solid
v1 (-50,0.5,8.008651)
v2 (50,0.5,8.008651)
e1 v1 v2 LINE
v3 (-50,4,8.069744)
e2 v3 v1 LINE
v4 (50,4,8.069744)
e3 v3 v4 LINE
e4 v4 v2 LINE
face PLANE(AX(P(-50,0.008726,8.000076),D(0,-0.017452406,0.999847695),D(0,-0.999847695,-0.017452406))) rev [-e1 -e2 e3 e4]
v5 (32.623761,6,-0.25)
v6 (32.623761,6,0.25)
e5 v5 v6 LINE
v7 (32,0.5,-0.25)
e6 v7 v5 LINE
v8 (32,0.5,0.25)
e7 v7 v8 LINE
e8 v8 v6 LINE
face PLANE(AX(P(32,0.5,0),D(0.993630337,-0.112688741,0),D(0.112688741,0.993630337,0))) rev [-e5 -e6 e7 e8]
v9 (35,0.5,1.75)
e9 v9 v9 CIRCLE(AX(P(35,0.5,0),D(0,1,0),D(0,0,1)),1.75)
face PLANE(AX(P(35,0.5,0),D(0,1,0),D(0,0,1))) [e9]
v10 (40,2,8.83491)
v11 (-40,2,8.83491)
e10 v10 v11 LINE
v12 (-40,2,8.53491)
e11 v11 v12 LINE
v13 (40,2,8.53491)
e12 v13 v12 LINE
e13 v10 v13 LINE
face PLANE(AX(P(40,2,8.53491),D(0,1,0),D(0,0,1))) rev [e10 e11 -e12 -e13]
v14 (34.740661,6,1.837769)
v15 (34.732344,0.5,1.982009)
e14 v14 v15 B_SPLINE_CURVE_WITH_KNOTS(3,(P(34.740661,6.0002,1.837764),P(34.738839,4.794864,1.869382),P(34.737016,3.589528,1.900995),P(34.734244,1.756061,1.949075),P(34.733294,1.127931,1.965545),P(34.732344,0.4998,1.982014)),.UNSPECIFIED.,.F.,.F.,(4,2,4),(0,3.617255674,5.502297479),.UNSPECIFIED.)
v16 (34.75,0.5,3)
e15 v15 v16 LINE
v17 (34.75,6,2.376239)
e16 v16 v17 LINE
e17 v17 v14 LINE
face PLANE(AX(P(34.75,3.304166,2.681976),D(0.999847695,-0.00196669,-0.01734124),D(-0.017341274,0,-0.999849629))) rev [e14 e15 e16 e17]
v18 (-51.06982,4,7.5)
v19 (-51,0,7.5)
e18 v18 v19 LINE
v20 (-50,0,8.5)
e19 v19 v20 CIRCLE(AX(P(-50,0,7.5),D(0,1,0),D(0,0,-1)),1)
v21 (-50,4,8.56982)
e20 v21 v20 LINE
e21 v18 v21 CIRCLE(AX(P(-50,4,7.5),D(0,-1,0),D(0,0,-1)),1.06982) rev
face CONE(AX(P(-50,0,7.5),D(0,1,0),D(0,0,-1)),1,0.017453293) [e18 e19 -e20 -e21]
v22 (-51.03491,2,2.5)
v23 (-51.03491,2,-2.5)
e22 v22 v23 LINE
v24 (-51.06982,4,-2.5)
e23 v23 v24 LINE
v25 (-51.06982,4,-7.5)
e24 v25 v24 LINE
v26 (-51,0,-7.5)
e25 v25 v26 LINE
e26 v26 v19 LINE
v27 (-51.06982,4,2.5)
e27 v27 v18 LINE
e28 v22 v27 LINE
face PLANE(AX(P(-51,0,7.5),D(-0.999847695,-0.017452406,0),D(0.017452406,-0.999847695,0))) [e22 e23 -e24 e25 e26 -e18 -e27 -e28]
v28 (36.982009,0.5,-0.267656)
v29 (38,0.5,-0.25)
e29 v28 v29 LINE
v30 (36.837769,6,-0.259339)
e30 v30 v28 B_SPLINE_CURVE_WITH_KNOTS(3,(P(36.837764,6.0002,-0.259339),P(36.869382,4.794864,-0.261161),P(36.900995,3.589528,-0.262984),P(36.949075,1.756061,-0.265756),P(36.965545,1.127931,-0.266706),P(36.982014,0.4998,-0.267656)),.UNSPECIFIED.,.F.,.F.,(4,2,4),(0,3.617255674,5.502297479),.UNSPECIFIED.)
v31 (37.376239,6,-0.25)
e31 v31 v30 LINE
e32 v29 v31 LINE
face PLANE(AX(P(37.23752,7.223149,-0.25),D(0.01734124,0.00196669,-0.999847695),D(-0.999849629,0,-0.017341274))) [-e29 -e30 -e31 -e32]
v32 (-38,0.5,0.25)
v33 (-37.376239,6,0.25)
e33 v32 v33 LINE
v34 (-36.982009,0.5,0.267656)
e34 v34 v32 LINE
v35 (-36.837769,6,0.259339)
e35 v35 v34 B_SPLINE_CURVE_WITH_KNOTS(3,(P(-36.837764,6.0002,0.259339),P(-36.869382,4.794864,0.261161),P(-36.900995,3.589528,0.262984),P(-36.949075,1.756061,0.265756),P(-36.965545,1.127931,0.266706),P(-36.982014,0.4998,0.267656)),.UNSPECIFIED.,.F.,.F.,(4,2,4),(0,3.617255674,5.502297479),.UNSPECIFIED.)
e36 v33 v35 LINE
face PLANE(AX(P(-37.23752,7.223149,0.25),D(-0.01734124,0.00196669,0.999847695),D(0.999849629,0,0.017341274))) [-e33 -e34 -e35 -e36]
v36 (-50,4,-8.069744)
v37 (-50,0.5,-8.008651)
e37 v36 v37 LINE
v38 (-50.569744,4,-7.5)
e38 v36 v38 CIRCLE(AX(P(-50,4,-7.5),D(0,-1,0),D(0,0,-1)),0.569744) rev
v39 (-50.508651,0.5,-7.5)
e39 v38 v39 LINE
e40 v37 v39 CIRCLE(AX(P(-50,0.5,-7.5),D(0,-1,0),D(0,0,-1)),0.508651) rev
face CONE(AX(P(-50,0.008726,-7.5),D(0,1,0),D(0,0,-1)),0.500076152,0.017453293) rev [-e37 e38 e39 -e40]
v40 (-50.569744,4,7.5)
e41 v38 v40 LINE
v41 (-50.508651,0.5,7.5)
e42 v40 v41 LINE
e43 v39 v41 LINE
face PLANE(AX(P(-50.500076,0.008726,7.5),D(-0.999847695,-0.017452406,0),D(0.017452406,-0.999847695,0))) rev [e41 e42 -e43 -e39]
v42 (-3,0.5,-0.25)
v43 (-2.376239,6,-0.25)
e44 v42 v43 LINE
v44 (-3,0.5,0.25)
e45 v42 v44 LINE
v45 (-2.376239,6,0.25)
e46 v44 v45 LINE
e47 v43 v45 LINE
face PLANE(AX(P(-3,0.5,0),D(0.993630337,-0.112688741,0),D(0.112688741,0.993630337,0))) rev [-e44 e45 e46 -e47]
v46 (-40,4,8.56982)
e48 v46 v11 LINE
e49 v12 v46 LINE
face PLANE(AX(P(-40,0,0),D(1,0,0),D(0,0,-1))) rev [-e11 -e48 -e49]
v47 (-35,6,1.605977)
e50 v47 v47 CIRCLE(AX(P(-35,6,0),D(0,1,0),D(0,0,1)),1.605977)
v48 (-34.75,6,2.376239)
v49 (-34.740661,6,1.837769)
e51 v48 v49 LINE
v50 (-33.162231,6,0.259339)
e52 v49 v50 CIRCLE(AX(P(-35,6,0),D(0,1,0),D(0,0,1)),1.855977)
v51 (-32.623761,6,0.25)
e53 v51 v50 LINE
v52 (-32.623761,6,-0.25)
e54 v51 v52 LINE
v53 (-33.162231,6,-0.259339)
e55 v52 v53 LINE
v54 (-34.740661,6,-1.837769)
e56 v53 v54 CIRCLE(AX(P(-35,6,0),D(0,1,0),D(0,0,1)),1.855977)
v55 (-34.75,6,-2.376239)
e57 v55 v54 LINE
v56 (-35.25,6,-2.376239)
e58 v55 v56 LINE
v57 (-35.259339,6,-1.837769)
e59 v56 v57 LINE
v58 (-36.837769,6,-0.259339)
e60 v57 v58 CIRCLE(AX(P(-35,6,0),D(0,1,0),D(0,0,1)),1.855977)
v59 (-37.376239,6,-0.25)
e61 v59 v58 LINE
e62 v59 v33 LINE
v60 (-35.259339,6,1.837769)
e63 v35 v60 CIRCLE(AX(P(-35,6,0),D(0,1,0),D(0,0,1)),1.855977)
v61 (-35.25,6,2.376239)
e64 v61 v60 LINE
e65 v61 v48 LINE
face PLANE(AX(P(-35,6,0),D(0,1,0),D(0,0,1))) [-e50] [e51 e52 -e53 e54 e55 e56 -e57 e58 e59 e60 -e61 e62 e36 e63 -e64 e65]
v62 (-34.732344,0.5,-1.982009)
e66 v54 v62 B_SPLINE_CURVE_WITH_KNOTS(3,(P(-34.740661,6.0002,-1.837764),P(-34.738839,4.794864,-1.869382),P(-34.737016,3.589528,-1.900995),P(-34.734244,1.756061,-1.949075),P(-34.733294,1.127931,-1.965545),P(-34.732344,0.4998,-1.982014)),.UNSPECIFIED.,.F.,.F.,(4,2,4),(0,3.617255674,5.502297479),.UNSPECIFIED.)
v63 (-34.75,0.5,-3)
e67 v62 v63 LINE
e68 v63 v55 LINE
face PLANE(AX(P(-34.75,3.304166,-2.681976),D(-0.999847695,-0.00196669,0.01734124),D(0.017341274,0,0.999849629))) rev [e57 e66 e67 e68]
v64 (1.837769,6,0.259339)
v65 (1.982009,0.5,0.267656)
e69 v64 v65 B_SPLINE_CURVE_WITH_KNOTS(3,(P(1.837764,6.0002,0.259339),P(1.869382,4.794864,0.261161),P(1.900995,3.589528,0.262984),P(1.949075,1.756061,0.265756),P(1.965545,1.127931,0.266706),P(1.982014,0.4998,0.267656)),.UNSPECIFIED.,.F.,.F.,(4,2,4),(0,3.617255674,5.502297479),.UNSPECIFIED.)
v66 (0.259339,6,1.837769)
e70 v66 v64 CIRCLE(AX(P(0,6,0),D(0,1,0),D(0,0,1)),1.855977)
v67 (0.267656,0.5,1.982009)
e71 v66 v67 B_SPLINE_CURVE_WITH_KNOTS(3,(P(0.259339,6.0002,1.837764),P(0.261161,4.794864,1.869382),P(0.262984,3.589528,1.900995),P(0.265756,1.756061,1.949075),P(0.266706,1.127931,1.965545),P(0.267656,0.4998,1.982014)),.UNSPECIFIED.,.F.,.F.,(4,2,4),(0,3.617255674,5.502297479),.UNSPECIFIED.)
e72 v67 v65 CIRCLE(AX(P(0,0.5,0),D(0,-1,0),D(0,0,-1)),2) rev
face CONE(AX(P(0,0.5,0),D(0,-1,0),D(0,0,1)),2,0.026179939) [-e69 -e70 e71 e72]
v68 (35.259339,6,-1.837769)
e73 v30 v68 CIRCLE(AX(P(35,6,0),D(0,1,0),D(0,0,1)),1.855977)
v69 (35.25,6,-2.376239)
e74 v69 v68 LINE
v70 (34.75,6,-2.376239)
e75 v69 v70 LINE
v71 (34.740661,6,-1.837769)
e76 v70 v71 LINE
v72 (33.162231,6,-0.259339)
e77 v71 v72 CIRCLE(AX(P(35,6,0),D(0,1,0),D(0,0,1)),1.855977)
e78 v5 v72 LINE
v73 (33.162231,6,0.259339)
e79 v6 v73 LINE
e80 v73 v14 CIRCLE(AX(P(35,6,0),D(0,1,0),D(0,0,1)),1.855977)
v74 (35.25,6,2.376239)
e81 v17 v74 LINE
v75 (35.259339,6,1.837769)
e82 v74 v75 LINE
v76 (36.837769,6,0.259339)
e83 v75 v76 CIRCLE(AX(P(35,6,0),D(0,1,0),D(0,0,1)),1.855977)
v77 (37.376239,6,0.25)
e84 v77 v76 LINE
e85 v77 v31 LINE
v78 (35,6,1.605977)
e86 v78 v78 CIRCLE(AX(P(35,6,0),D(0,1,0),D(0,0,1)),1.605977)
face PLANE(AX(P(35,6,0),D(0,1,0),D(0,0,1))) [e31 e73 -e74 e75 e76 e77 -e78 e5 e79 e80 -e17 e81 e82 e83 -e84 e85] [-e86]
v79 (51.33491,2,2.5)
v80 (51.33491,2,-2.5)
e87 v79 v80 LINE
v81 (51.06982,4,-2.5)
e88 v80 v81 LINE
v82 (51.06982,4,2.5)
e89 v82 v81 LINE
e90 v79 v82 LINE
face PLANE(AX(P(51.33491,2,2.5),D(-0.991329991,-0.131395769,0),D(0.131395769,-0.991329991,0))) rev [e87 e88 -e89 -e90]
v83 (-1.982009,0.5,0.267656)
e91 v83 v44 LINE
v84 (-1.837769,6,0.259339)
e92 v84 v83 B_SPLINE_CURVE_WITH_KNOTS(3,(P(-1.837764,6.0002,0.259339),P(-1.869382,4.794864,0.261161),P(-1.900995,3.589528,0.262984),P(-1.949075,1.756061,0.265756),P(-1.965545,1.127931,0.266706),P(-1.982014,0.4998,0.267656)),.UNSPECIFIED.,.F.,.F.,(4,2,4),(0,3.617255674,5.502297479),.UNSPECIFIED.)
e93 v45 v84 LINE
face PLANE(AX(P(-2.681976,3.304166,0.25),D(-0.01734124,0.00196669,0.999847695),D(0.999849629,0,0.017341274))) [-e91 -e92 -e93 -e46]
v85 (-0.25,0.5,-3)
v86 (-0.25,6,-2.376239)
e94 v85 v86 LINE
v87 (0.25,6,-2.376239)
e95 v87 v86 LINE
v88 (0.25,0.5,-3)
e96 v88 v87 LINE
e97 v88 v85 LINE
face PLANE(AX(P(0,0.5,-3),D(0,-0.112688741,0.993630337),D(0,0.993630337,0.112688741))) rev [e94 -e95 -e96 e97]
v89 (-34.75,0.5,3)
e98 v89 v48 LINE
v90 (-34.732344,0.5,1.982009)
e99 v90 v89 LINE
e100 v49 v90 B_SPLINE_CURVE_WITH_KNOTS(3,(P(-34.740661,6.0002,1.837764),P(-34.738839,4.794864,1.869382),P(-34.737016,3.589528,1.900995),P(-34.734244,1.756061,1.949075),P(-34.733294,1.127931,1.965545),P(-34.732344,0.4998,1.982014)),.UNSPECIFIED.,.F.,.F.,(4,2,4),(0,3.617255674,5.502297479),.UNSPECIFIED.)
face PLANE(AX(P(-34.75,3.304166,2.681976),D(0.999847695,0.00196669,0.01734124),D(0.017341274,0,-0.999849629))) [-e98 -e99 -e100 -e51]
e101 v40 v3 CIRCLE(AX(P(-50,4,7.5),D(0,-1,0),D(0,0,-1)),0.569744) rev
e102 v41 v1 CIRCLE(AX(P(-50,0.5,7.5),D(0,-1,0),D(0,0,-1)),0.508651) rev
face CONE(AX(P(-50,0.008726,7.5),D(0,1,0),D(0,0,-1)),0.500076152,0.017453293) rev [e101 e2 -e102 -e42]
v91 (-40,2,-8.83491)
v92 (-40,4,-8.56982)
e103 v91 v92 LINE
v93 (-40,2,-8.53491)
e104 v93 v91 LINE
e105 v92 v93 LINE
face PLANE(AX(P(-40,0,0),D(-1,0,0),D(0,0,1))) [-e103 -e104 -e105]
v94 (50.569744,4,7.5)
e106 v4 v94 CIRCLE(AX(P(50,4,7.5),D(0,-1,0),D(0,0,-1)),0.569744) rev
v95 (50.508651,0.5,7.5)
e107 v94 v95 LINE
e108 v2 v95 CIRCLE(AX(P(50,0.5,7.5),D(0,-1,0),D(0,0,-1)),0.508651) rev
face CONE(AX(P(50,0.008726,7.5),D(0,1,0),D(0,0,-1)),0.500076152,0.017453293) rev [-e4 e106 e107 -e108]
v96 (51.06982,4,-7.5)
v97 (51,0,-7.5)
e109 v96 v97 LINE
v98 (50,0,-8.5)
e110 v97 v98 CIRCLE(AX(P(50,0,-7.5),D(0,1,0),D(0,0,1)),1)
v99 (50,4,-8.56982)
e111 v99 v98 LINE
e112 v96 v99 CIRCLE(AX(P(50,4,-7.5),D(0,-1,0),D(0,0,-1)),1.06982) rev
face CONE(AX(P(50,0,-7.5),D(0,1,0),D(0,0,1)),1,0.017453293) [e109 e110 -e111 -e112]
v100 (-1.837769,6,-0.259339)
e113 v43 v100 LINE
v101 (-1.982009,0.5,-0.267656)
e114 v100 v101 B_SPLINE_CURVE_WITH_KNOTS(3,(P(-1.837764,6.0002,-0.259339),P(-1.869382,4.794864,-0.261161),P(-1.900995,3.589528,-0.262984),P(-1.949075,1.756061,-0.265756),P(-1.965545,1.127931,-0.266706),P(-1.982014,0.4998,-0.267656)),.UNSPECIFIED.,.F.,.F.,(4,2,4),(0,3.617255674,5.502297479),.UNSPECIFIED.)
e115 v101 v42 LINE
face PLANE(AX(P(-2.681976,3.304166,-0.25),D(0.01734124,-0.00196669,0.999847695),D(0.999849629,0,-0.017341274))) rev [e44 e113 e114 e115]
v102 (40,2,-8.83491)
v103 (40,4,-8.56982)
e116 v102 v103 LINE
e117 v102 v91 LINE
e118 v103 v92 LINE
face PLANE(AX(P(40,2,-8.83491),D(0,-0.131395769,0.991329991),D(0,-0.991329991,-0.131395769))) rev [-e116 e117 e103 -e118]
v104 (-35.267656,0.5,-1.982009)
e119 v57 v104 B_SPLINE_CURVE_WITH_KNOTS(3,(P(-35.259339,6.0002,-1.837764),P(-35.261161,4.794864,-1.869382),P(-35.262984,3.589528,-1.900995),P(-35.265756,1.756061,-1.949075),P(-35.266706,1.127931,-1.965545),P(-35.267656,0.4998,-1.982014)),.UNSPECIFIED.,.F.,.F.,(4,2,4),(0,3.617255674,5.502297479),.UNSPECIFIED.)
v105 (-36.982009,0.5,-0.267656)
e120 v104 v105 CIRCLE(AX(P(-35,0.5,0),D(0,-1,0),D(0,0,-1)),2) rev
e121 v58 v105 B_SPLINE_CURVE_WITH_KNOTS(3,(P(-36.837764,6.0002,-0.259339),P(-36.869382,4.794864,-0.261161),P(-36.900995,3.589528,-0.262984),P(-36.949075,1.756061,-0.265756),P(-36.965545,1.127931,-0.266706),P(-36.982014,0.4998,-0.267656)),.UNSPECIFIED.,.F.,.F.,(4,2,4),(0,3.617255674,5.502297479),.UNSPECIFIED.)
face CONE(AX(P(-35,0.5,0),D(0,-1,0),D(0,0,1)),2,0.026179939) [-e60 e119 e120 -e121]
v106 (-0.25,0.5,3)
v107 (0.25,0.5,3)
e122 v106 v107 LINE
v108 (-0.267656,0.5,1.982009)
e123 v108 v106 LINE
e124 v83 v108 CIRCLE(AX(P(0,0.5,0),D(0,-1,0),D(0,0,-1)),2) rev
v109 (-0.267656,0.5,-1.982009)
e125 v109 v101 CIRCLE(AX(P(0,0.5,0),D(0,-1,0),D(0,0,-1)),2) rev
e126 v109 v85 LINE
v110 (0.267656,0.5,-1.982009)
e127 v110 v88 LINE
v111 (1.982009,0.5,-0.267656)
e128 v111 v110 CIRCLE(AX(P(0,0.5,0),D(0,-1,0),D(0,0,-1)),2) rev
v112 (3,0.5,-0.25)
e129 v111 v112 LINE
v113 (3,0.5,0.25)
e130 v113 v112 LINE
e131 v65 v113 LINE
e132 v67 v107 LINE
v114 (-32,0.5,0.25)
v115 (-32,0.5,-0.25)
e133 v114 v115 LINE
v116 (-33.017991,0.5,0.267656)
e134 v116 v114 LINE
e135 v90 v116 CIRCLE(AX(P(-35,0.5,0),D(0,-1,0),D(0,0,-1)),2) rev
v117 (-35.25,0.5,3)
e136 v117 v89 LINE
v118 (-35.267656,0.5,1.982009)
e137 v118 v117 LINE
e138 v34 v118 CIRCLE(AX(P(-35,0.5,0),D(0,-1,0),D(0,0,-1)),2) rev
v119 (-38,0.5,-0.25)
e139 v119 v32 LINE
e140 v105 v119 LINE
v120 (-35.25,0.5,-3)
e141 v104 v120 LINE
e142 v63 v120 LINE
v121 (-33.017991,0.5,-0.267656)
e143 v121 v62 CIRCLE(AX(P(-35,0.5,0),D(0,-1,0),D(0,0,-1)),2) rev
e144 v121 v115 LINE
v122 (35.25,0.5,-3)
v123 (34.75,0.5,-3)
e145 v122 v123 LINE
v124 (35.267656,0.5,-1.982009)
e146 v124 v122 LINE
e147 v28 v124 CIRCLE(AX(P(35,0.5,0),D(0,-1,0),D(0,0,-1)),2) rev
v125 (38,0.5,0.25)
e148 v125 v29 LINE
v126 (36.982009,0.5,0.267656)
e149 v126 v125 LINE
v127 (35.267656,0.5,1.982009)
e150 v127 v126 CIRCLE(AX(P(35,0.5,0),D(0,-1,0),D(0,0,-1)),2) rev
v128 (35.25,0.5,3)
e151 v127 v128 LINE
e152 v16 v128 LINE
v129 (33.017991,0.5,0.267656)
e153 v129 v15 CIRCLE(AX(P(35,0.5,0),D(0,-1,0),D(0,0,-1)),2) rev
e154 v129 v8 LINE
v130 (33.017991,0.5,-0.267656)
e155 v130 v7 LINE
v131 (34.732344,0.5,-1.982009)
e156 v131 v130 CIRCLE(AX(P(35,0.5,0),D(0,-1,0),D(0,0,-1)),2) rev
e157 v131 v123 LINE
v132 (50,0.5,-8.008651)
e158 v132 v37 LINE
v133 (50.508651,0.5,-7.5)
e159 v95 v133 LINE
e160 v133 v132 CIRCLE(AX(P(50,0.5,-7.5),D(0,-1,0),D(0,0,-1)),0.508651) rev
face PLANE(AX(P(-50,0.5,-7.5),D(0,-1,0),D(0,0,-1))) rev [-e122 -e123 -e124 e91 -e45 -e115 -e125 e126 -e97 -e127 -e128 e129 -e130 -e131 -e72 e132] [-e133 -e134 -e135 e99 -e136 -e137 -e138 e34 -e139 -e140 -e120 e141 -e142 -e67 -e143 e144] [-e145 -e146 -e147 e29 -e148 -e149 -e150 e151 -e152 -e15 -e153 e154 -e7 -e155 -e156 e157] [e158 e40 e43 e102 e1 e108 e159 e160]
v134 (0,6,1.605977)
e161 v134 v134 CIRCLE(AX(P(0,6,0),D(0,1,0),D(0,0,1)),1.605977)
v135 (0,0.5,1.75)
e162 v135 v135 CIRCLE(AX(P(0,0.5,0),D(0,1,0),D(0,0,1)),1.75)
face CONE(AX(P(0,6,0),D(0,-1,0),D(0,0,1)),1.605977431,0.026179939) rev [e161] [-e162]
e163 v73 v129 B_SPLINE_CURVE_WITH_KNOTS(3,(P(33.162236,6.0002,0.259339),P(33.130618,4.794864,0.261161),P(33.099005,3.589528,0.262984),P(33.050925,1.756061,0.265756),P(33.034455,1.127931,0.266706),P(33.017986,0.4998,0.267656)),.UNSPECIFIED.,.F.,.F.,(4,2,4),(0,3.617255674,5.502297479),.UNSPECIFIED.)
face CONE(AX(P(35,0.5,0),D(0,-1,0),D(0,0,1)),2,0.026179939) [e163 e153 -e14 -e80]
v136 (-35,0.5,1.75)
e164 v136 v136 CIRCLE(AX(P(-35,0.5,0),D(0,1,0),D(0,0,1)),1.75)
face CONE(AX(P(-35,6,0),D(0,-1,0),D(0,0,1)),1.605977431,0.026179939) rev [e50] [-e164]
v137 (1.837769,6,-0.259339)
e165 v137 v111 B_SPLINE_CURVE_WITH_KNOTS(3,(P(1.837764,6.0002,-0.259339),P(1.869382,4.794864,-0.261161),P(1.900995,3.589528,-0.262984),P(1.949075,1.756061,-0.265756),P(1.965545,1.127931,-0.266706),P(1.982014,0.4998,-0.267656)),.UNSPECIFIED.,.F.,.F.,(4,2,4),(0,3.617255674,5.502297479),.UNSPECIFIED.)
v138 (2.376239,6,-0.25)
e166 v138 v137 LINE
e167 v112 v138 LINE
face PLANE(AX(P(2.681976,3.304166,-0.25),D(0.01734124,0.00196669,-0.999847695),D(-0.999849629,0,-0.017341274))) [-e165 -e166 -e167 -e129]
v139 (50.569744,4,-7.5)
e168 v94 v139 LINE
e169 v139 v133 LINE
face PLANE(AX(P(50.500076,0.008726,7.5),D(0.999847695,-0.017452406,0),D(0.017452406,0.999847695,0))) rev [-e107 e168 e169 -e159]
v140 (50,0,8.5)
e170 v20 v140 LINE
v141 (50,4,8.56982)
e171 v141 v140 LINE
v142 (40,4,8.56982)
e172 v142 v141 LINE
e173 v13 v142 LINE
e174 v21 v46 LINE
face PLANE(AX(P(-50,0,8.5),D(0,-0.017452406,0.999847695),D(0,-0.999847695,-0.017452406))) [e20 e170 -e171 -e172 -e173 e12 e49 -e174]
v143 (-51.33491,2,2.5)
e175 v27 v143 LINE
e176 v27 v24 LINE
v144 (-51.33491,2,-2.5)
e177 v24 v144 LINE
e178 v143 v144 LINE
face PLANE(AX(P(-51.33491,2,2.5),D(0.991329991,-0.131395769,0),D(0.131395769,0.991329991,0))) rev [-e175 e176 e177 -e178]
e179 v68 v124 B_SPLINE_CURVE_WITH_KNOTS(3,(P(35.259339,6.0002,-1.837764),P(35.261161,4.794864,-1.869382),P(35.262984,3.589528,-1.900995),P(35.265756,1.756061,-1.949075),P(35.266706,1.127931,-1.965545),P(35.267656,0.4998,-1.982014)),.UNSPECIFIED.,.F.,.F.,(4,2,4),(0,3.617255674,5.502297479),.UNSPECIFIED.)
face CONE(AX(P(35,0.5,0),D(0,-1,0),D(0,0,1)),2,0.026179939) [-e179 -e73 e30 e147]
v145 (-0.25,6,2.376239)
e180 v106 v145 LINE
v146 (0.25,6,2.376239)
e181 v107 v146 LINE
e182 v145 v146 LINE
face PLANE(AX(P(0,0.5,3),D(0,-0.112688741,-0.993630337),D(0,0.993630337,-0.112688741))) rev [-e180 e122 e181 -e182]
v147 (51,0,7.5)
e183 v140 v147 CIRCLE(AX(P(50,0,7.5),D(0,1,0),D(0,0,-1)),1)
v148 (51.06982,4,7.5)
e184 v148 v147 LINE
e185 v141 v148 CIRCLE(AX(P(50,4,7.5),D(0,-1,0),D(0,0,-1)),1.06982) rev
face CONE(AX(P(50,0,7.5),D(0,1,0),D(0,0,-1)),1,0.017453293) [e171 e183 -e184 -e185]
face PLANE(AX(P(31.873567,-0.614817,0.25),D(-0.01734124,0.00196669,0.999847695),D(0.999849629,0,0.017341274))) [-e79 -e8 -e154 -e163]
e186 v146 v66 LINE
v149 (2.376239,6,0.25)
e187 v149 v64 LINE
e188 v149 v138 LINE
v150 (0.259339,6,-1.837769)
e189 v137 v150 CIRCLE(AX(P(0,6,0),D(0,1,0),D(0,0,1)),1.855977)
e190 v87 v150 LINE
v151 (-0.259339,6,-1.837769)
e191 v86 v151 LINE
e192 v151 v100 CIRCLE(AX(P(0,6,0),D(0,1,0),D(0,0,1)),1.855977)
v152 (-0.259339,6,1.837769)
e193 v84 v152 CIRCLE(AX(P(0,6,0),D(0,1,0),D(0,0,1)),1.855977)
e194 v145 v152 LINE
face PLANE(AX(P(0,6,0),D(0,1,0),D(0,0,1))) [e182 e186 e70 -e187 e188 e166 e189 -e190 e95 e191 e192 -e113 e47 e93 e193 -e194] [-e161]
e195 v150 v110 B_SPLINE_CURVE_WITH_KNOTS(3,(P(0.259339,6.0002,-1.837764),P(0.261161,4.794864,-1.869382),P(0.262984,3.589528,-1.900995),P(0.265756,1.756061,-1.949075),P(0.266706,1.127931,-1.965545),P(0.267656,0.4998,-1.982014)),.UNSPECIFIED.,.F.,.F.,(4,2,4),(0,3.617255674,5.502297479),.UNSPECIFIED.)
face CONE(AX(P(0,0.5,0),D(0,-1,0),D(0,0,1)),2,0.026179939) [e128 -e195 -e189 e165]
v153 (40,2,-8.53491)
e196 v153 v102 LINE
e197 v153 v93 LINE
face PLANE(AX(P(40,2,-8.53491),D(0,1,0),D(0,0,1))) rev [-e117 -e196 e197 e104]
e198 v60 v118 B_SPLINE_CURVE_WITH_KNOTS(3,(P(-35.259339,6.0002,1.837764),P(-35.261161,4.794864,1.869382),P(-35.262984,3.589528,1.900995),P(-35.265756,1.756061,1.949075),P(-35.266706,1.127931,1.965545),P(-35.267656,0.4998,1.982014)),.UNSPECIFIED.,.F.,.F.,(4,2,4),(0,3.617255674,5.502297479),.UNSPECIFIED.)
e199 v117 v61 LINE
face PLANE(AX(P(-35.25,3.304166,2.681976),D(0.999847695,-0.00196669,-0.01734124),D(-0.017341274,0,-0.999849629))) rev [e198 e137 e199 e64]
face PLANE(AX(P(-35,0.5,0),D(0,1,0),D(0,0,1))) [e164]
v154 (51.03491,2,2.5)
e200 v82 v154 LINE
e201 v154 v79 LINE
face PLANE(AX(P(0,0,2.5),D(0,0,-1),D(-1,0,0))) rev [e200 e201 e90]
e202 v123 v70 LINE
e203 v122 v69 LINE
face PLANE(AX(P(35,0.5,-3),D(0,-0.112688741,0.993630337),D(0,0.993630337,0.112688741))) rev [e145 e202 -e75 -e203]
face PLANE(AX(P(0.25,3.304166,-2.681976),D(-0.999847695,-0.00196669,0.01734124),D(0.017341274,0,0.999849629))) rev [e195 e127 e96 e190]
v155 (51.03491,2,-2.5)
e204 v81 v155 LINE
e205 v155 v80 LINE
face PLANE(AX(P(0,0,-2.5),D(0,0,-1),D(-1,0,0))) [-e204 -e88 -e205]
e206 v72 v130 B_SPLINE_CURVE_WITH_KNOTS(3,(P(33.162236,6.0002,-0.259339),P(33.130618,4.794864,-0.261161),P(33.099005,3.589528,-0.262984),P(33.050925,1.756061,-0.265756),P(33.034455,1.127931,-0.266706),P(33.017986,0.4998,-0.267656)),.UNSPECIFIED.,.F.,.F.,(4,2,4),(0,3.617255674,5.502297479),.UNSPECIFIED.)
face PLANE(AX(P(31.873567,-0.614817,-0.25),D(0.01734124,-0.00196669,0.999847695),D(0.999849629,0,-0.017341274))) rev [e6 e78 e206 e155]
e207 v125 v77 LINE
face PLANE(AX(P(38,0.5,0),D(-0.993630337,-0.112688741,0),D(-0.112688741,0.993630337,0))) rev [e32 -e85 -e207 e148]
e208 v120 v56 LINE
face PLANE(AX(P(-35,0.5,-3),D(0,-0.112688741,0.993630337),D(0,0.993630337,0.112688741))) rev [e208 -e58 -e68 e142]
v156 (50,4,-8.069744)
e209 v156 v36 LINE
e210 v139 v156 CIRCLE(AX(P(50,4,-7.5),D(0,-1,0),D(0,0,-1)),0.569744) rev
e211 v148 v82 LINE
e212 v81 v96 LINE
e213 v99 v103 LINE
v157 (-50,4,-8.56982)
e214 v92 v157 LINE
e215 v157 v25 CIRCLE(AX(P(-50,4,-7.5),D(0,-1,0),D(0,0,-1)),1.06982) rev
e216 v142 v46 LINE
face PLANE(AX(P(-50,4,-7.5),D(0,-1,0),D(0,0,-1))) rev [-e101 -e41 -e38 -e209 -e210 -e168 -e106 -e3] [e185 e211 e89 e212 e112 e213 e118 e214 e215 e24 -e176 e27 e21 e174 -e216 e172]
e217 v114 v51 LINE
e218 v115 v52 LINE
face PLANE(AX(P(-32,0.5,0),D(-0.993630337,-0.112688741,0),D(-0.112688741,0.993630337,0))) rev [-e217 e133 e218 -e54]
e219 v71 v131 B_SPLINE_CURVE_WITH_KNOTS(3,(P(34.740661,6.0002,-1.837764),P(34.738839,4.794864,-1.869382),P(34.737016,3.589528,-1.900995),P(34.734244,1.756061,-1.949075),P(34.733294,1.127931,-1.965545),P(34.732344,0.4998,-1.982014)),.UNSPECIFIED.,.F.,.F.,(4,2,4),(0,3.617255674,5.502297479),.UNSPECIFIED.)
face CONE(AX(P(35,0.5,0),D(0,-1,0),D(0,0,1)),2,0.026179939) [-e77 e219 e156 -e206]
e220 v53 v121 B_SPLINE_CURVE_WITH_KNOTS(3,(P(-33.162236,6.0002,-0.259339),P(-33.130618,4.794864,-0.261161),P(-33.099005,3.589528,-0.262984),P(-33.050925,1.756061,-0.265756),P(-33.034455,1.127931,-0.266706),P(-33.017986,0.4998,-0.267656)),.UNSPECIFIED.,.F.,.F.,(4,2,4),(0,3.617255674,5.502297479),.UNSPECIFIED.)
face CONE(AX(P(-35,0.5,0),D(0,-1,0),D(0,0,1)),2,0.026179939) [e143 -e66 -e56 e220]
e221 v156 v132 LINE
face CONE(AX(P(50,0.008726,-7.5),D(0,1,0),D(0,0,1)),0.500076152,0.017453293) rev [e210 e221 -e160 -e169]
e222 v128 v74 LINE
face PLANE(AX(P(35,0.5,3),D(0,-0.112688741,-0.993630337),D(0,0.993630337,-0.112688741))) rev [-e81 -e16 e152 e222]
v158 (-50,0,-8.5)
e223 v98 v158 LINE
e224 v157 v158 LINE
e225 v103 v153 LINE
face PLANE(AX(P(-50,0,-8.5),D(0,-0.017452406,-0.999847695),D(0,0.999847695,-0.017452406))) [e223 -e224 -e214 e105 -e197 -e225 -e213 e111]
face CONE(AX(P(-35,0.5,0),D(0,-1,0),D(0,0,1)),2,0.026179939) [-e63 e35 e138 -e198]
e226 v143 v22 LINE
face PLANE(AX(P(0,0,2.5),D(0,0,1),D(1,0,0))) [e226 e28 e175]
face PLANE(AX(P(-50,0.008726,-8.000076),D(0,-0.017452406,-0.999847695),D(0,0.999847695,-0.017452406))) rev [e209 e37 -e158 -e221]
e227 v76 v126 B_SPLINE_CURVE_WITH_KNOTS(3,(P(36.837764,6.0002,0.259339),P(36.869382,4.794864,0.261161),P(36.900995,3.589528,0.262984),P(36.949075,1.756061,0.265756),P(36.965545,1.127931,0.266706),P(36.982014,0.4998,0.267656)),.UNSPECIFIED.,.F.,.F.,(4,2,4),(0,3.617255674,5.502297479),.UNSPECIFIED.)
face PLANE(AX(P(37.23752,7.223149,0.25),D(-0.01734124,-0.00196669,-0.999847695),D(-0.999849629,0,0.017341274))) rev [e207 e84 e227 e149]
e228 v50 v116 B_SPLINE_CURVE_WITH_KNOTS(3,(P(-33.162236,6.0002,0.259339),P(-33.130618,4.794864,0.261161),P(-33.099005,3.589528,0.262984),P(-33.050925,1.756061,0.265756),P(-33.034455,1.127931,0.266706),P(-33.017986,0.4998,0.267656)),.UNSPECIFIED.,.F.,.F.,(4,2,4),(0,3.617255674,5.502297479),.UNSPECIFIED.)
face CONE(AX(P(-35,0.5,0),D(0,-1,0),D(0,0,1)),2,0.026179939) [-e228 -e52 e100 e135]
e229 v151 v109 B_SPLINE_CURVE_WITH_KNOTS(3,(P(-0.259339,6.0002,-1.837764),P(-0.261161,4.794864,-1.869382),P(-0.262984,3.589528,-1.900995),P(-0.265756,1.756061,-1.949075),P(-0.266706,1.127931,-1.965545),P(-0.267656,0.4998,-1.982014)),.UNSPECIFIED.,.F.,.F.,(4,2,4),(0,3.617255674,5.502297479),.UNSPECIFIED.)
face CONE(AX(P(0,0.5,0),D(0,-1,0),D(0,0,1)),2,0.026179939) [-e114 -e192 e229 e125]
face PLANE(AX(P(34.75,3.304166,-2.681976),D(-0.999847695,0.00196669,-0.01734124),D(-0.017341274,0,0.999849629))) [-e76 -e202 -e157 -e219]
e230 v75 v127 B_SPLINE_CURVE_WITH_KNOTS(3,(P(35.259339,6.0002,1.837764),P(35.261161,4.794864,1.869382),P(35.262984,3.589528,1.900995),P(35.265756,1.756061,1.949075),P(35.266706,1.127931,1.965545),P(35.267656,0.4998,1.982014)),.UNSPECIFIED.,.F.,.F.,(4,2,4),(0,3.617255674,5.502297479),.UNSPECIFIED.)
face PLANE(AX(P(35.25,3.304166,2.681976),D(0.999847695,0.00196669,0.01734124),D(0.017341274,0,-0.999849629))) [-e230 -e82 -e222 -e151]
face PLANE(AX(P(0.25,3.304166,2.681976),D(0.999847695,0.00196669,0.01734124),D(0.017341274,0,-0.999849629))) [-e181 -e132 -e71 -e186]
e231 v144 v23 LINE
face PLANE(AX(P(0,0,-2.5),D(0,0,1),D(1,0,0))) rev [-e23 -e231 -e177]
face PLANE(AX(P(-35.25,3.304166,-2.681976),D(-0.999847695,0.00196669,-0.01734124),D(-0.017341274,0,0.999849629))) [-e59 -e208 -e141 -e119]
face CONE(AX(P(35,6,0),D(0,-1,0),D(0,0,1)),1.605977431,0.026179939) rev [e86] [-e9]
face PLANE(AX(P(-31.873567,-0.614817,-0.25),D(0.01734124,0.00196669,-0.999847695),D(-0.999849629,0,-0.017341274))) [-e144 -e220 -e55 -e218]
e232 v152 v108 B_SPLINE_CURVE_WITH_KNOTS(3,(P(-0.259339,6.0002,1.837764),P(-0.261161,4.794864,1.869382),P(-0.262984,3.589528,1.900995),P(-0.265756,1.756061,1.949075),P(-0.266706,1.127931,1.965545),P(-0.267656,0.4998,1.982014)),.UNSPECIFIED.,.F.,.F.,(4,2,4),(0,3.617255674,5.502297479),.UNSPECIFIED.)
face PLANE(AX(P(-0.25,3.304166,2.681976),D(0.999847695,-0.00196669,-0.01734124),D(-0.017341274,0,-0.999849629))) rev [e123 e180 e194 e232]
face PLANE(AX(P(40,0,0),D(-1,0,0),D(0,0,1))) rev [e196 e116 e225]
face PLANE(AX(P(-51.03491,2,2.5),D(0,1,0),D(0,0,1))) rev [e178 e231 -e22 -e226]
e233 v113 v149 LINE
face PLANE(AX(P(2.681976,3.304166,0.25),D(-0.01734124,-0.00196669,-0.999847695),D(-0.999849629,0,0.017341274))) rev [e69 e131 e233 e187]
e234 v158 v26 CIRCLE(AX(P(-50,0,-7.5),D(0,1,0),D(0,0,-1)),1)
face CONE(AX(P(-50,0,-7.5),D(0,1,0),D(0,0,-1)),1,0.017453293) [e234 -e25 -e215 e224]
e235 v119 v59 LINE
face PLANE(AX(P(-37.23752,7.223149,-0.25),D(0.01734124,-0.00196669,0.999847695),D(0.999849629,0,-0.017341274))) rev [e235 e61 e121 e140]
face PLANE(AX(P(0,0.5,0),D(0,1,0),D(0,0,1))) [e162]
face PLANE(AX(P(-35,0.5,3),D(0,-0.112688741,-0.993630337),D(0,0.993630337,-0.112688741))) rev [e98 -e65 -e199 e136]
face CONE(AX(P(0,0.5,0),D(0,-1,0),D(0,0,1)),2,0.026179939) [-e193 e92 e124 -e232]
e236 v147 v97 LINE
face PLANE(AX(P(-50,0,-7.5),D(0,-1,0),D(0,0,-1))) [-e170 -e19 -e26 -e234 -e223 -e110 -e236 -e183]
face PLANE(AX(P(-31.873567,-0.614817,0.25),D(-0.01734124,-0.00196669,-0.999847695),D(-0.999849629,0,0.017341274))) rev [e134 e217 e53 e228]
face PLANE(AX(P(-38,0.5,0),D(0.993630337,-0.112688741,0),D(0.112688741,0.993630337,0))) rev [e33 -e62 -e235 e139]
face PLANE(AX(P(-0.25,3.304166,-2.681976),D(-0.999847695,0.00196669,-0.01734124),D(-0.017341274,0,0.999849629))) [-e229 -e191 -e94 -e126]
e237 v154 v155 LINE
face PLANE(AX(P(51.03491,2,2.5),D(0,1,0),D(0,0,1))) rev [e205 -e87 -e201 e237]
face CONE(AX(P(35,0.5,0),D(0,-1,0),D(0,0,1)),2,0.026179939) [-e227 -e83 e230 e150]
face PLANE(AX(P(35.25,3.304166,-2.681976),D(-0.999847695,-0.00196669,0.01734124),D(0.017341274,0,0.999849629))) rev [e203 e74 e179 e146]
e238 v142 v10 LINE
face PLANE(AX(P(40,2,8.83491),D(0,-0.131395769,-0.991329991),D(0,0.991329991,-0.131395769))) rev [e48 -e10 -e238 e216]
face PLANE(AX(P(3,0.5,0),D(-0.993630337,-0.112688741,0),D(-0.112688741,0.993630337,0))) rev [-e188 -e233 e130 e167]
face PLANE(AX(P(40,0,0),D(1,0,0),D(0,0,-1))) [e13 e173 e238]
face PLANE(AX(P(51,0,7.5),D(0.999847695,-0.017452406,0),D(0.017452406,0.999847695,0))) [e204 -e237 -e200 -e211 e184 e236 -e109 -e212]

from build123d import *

# Parameters (mm, degrees)
BOSS_EXTRUDE1_DEPTH           = 4
BOSS_EXTRUDE1_DRAFT           = -1
SHELL1_T                      = -0.5
SKETCH2_R                     = 2
BOSS_EXTRUDE2_DEPTH           = 5.5
BOSS_EXTRUDE2_DRAFT           = 1.5
BOSS_EXTRUDE2_PROFILE_2_DEPTH = 5.5
BOSS_EXTRUDE2_PROFILE_2_DRAFT = 1.5
BOSS_EXTRUDE2_PROFILE_3_DEPTH = 5.5
BOSS_EXTRUDE2_PROFILE_3_DRAFT = 1.5
CIRPATTERN1_COUNT             = 4
SKETCH6_R                     = 1.605977431
CUT_EXTRUDE1_DEPTH            = 5.5
CUT_EXTRUDE1_DRAFT            = 1.5
CUT_EXTRUDE1_PROFILE_2_DEPTH  = 5.5
CUT_EXTRUDE1_PROFILE_2_DRAFT  = 1.5
CUT_EXTRUDE1_PROFILE_3_DEPTH  = 5.5
CUT_EXTRUDE1_PROFILE_3_DRAFT  = 1.5
BOSS_EXTRUDE3_DEPTH           = 2.5
BOSS_EXTRUDE4_DEPTH           = 40


with BuildPart() as part:
    # Sketch1 → Boss-Extrude1 (with draft: the straight prism first)
    with BuildSketch(Plane(origin=(0, 0, 0), x_dir=(1, 0, 0), z_dir=(0, 1, 0))):
        with BuildLine():
            Line((-50, -8.5), (50, -8.5))
            ThreePointArc((50, -8.5), (50.707106781, -8.207106781), (51, -7.5))
            Line((51, -7.5), (51, 7.5))
            ThreePointArc((51, 7.5), (50.707106781, 8.207106781), (50, 8.5))
            Line((50, 8.5), (-50, 8.5))
            ThreePointArc((-50, 8.5), (-50.707106781, 8.207106781), (-51, 7.5))
            Line((-51, 7.5), (-51, -7.5))
            ThreePointArc((-51, -7.5), (-50.707106781, -8.207106781), (-50, -8.5))
        make_face()
    extrude(amount=BOSS_EXTRUDE1_DEPTH)
    # Boss-Extrude1: the draft: its side faces are tilted about the plane it starts from
    boss_extrude1_sides = [part.faces().sort_by_distance(p)[0] for p in [
        (0, 2, 8.5),
        (50.707106781, 2, 8.207106781),
        (51, 2, 0),
        (50.707106781, 2, -8.207106781),
        (0, 2, -8.5),
        (-50.707106781, 2, -8.207106781),
        (-51, 2, 0),
        (-50.707106781, 2, 8.207106781),
    ]]
    draft(boss_extrude1_sides, Plane(origin=(0, 0, 0), x_dir=(1, 0, 0), z_dir=(0, 1, 0)), BOSS_EXTRUDE1_DRAFT)

    # Shell1
    shell1_openings = [part.faces().sort_by_distance(p)[0] for p in [
        (0, 4, 0),
    ]]
    offset(amount=SHELL1_T, openings=shell1_openings, kind=Kind.INTERSECTION)


with BuildPart() as boss_extrude2_tool:
    # Sketch2 → Boss-Extrude2 (with draft: the straight prism first)
    with BuildSketch(Plane(origin=(0, 0.5, 0), x_dir=(1, 0, 0), z_dir=(0, 1, 0))):
        with Locations((35, 0)):
            Circle(SKETCH2_R)
    extrude(amount=BOSS_EXTRUDE2_DEPTH)
    # Boss-Extrude2: the draft: its side faces are tilted about the plane it starts from
    boss_extrude2_sides = [boss_extrude2_tool.faces().sort_by_distance(p)[0] for p in [
        (33, 3.25, 0),
    ]]
    draft(boss_extrude2_sides, Plane(origin=(0, 0.5, 0), x_dir=(1, 0, 0), z_dir=(0, 1, 0)), BOSS_EXTRUDE2_DRAFT)


with BuildPart() as part_1:
    add(part.part)

    # Boss-Extrude2: add boss_extrude2_tool
    add(boss_extrude2_tool.part)


with BuildPart() as boss_extrude2_profile_2_tool:
    # Sketch2 → Boss-Extrude2 profile 2 (with draft: the straight prism first)
    with BuildSketch(Plane(origin=(0, 0.5, 0), x_dir=(1, 0, 0), z_dir=(0, 1, 0))):
        Circle(SKETCH2_R)
    extrude(amount=BOSS_EXTRUDE2_PROFILE_2_DEPTH)
    # Boss-Extrude2 profile 2: the draft: its side faces are tilted about the plane it starts from
    boss_extrude2_profile_2_sides = [boss_extrude2_profile_2_tool.faces().sort_by_distance(p)[0] for p in [
        (-2, 3.25, 0),
    ]]
    draft(boss_extrude2_profile_2_sides, Plane(origin=(0, 0.5, 0), x_dir=(1, 0, 0), z_dir=(0, 1, 0)), BOSS_EXTRUDE2_PROFILE_2_DRAFT)


with BuildPart() as part_2:
    add(part_1.part)

    # Boss-Extrude2 profile 2: add boss_extrude2_profile_2_tool
    add(boss_extrude2_profile_2_tool.part)


with BuildPart() as boss_extrude2_profile_3_tool:
    # Sketch2 → Boss-Extrude2 profile 3 (with draft: the straight prism first)
    with BuildSketch(Plane(origin=(0, 0.5, 0), x_dir=(1, 0, 0), z_dir=(0, 1, 0))):
        with Locations((-35, 0)):
            Circle(SKETCH2_R)
    extrude(amount=BOSS_EXTRUDE2_PROFILE_3_DEPTH)
    # Boss-Extrude2 profile 3: the draft: its side faces are tilted about the plane it starts from
    boss_extrude2_profile_3_sides = [boss_extrude2_profile_3_tool.faces().sort_by_distance(p)[0] for p in [
        (-37, 3.25, 0),
    ]]
    draft(boss_extrude2_profile_3_sides, Plane(origin=(0, 0.5, 0), x_dir=(1, 0, 0), z_dir=(0, 1, 0)), BOSS_EXTRUDE2_PROFILE_3_DRAFT)


with BuildPart() as part_3:
    add(part_2.part)

    # Boss-Extrude2 profile 3: add boss_extrude2_profile_3_tool
    add(boss_extrude2_profile_3_tool.part)

    # Rib1: read off the stored shape, not the designer's step
    # Rib1: loft between two sections, ruled curve by curve
    rib1_from = [
        Edge.make_line((-1.837769145, 6, 0.259339154), (-2.376238774, 6, 0.25)),
        Edge.make_line((-2.376238774, 6, -0.25), (-1.837769145, 6, -0.259339154)),
        Edge.make_line((-2.376238774, 6, -0.25), (-2.376238774, 6, 0.25)),
        Edge.make_line((-1.837769145, 6, -0.259339154), (-1.837769145, 6, 0.259339154)),
    ]
    rib1_to = [
        Edge.make_line((-1.98200916, 0.5, 0.267655913), (-3, 0.5, 0.25)),
        Edge.make_line((-3, 0.5, -0.25), (-1.98200916, 0.5, -0.267655913)),
        Edge.make_line((-3, 0.5, -0.25), (-3, 0.5, 0.25)),
        Edge.make_line((-1.98200916, 0.5, -0.267655913), (-1.98200916, 0.5, 0.267655913)),
    ]
    rib1 = Solid(Shell([*[Face.make_surface_from_curves(rib1_from[k], rib1_to[k]) for k in range(4)], Face(Wire(rib1_from)), Face(Wire(rib1_to))]))
    add(rib1)

    # CirPattern1: Rib1 ×4 about axis
    cirpattern1_axis = Axis((0, 0, 0), (0, 1, 0))
    for i in range(1, CIRPATTERN1_COUNT):
        add(rib1.rotate(cirpattern1_axis, i * 360 / CIRPATTERN1_COUNT))

    # LPattern3: read off the stored shape, not the designer's step
    # LPattern3: loft between two sections, ruled curve by curve
    lpattern3_from = [
        Edge.make_line((34.75, 6, 2.376238774), (35.25, 6, 2.376238774)),
        Edge.make_line((35.259339154, 6, 1.837769145), (35.25, 6, 2.376238774)),
        Edge.make_line((34.75, 6, 2.376238774), (34.740660846, 6, 1.837769145)),
        Edge.make_line((34.740660846, 6, 1.837769145), (35.259339154, 6, 1.837769145)),
    ]
    lpattern3_to = [
        Edge.make_line((34.75, 0.5, 3), (35.25, 0.5, 3)),
        Edge.make_line((35.267655913, 0.5, 1.98200916), (35.25, 0.5, 3)),
        Edge.make_line((34.75, 0.5, 3), (34.732344087, 0.5, 1.98200916)),
        Edge.make_line((34.732344087, 0.5, 1.98200916), (35.267655913, 0.5, 1.98200916)),
    ]
    lpattern3 = Solid(Shell([*[Face.make_surface_from_curves(lpattern3_from[k], lpattern3_to[k]) for k in range(4)], Face(Wire(lpattern3_from)), Face(Wire(lpattern3_to))]))
    add(lpattern3)

    # LPattern3 2: loft between two sections, ruled curve by curve
    lpattern3_2_from = [
        Edge.make_line((35.25, 6, -2.376238774), (34.75, 6, -2.376238774)),
        Edge.make_line((34.740660846, 6, -1.837769145), (34.75, 6, -2.376238774)),
        Edge.make_line((35.25, 6, -2.376238774), (35.259339154, 6, -1.837769145)),
        Edge.make_line((35.259339154, 6, -1.837769145), (34.740660846, 6, -1.837769145)),
    ]
    lpattern3_2_to = [
        Edge.make_line((35.25, 0.5, -3), (34.75, 0.5, -3)),
        Edge.make_line((34.732344087, 0.5, -1.98200916), (34.75, 0.5, -3)),
        Edge.make_line((35.25, 0.5, -3), (35.267655913, 0.5, -1.98200916)),
        Edge.make_line((35.267655913, 0.5, -1.98200916), (34.732344087, 0.5, -1.98200916)),
    ]
    lpattern3_2 = Solid(Shell([*[Face.make_surface_from_curves(lpattern3_2_from[k], lpattern3_2_to[k]) for k in range(4)], Face(Wire(lpattern3_2_from)), Face(Wire(lpattern3_2_to))]))
    add(lpattern3_2)

    # LPattern3 3: loft between two sections, ruled curve by curve
    lpattern3_3_from = [
        Edge.make_line((33.162230855, 6, 0.259339154), (32.623761226, 6, 0.25)),
        Edge.make_line((32.623761226, 6, -0.25), (33.162230855, 6, -0.259339154)),
        Edge.make_line((32.623761226, 6, -0.25), (32.623761226, 6, 0.25)),
        Edge.make_line((33.162230855, 6, -0.259339154), (33.162230855, 6, 0.259339154)),
    ]
    lpattern3_3_to = [
        Edge.make_line((33.01799084, 0.5, 0.267655913), (32, 0.5, 0.25)),
        Edge.make_line((32, 0.5, -0.25), (33.01799084, 0.5, -0.267655913)),
        Edge.make_line((32, 0.5, -0.25), (32, 0.5, 0.25)),
        Edge.make_line((33.01799084, 0.5, -0.267655913), (33.01799084, 0.5, 0.267655913)),
    ]
    lpattern3_3 = Solid(Shell([*[Face.make_surface_from_curves(lpattern3_3_from[k], lpattern3_3_to[k]) for k in range(4)], Face(Wire(lpattern3_3_from)), Face(Wire(lpattern3_3_to))]))
    add(lpattern3_3)

    # LPattern3 4: loft between two sections, ruled curve by curve
    lpattern3_4_from = [
        Edge.make_line((36.837769145, 6, -0.259339154), (37.376238774, 6, -0.25)),
        Edge.make_line((37.376238774, 6, 0.25), (36.837769145, 6, 0.259339154)),
        Edge.make_line((37.376238774, 6, 0.25), (37.376238774, 6, -0.25)),
        Edge.make_line((36.837769145, 6, 0.259339154), (36.837769145, 6, -0.259339154)),
    ]
    lpattern3_4_to = [
        Edge.make_line((36.98200916, 0.5, -0.267655913), (38, 0.5, -0.25)),
        Edge.make_line((38, 0.5, 0.25), (36.98200916, 0.5, 0.267655913)),
        Edge.make_line((38, 0.5, 0.25), (38, 0.5, -0.25)),
        Edge.make_line((36.98200916, 0.5, 0.267655913), (36.98200916, 0.5, -0.267655913)),
    ]
    lpattern3_4 = Solid(Shell([*[Face.make_surface_from_curves(lpattern3_4_from[k], lpattern3_4_to[k]) for k in range(4)], Face(Wire(lpattern3_4_from)), Face(Wire(lpattern3_4_to))]))
    add(lpattern3_4)

    # LPattern5: read off the stored shape, not the designer's step
    # LPattern5: loft between two sections, ruled curve by curve
    lpattern5_from = [
        Edge.make_line((-35.25, 6, 2.376238774), (-34.75, 6, 2.376238774)),
        Edge.make_line((-34.740660846, 6, 1.837769145), (-34.75, 6, 2.376238774)),
        Edge.make_line((-35.25, 6, 2.376238774), (-35.259339154, 6, 1.837769145)),
        Edge.make_line((-35.259339154, 6, 1.837769145), (-34.740660846, 6, 1.837769145)),
    ]
    lpattern5_to = [
        Edge.make_line((-35.25, 0.5, 3), (-34.75, 0.5, 3)),
        Edge.make_line((-34.732344087, 0.5, 1.98200916), (-34.75, 0.5, 3)),
        Edge.make_line((-35.25, 0.5, 3), (-35.267655913, 0.5, 1.98200916)),
        Edge.make_line((-35.267655913, 0.5, 1.98200916), (-34.732344087, 0.5, 1.98200916)),
    ]
    lpattern5 = Solid(Shell([*[Face.make_surface_from_curves(lpattern5_from[k], lpattern5_to[k]) for k in range(4)], Face(Wire(lpattern5_from)), Face(Wire(lpattern5_to))]))
    add(lpattern5)

    # LPattern5 2: loft between two sections, ruled curve by curve
    lpattern5_2_from = [
        Edge.make_line((-34.75, 6, -2.376238774), (-35.25, 6, -2.376238774)),
        Edge.make_line((-35.259339154, 6, -1.837769145), (-35.25, 6, -2.376238774)),
        Edge.make_line((-34.75, 6, -2.376238774), (-34.740660846, 6, -1.837769145)),
        Edge.make_line((-34.740660846, 6, -1.837769145), (-35.259339154, 6, -1.837769145)),
    ]
    lpattern5_2_to = [
        Edge.make_line((-34.75, 0.5, -3), (-35.25, 0.5, -3)),
        Edge.make_line((-35.267655913, 0.5, -1.98200916), (-35.25, 0.5, -3)),
        Edge.make_line((-34.75, 0.5, -3), (-34.732344087, 0.5, -1.98200916)),
        Edge.make_line((-34.732344087, 0.5, -1.98200916), (-35.267655913, 0.5, -1.98200916)),
    ]
    lpattern5_2 = Solid(Shell([*[Face.make_surface_from_curves(lpattern5_2_from[k], lpattern5_2_to[k]) for k in range(4)], Face(Wire(lpattern5_2_from)), Face(Wire(lpattern5_2_to))]))
    add(lpattern5_2)

    # LPattern5 3: loft between two sections, ruled curve by curve
    lpattern5_3_from = [
        Edge.make_line((-36.837769145, 6, 0.259339154), (-37.376238774, 6, 0.25)),
        Edge.make_line((-37.376238774, 6, -0.25), (-36.837769145, 6, -0.259339154)),
        Edge.make_line((-37.376238774, 6, -0.25), (-37.376238774, 6, 0.25)),
        Edge.make_line((-36.837769145, 6, -0.259339154), (-36.837769145, 6, 0.259339154)),
    ]
    lpattern5_3_to = [
        Edge.make_line((-36.98200916, 0.5, 0.267655913), (-38, 0.5, 0.25)),
        Edge.make_line((-38, 0.5, -0.25), (-36.98200916, 0.5, -0.267655913)),
        Edge.make_line((-38, 0.5, -0.25), (-38, 0.5, 0.25)),
        Edge.make_line((-36.98200916, 0.5, -0.267655913), (-36.98200916, 0.5, 0.267655913)),
    ]
    lpattern5_3 = Solid(Shell([*[Face.make_surface_from_curves(lpattern5_3_from[k], lpattern5_3_to[k]) for k in range(4)], Face(Wire(lpattern5_3_from)), Face(Wire(lpattern5_3_to))]))
    add(lpattern5_3)

    # LPattern5 4: loft between two sections, ruled curve by curve
    lpattern5_4_from = [
        Edge.make_line((-33.162230855, 6, -0.259339154), (-32.623761226, 6, -0.25)),
        Edge.make_line((-32.623761226, 6, 0.25), (-33.162230855, 6, 0.259339154)),
        Edge.make_line((-32.623761226, 6, 0.25), (-32.623761226, 6, -0.25)),
        Edge.make_line((-33.162230855, 6, 0.259339154), (-33.162230855, 6, -0.259339154)),
    ]
    lpattern5_4_to = [
        Edge.make_line((-33.01799084, 0.5, -0.267655913), (-32, 0.5, -0.25)),
        Edge.make_line((-32, 0.5, 0.25), (-33.01799084, 0.5, 0.267655913)),
        Edge.make_line((-32, 0.5, 0.25), (-32, 0.5, -0.25)),
        Edge.make_line((-33.01799084, 0.5, 0.267655913), (-33.01799084, 0.5, -0.267655913)),
    ]
    lpattern5_4 = Solid(Shell([*[Face.make_surface_from_curves(lpattern5_4_from[k], lpattern5_4_to[k]) for k in range(4)], Face(Wire(lpattern5_4_from)), Face(Wire(lpattern5_4_to))]))
    add(lpattern5_4)


with BuildPart() as cut_extrude1_tool:
    # Sketch6 → Cut-Extrude1 (with draft: the straight prism first)
    with BuildSketch(Plane(origin=(0, 6, 0), x_dir=(1, 0, 0), z_dir=(0, 1, 0))):
        with Locations((-35, 0)):
            Circle(SKETCH6_R)
    extrude(amount=-CUT_EXTRUDE1_DEPTH)
    # Cut-Extrude1: the draft: its side faces are tilted about the plane it starts from
    cut_extrude1_sides = [cut_extrude1_tool.faces().sort_by_distance(p)[0] for p in [
        (-36.605977431, 3.25, 0),
    ]]
    draft(cut_extrude1_sides, Plane(origin=(0, 6, 0), x_dir=(1, 0, 0), z_dir=(0, 1, 0)), CUT_EXTRUDE1_DRAFT)


with BuildPart() as part_4:
    add(part_3.part)

    # Cut-Extrude1: cut by cut_extrude1_tool
    add(cut_extrude1_tool.part, mode=Mode.SUBTRACT)


with BuildPart() as cut_extrude1_profile_2_tool:
    # Sketch6 → Cut-Extrude1 profile 2 (with draft: the straight prism first)
    with BuildSketch(Plane(origin=(0, 6, 0), x_dir=(1, 0, 0), z_dir=(0, 1, 0))):
        Circle(SKETCH6_R)
    extrude(amount=-CUT_EXTRUDE1_PROFILE_2_DEPTH)
    # Cut-Extrude1 profile 2: the draft: its side faces are tilted about the plane it starts from
    cut_extrude1_profile_2_sides = [cut_extrude1_profile_2_tool.faces().sort_by_distance(p)[0] for p in [
        (-1.605977431, 3.25, 0),
    ]]
    draft(cut_extrude1_profile_2_sides, Plane(origin=(0, 6, 0), x_dir=(1, 0, 0), z_dir=(0, 1, 0)), CUT_EXTRUDE1_PROFILE_2_DRAFT)


with BuildPart() as part_5:
    add(part_4.part)

    # Cut-Extrude1 profile 2: cut by cut_extrude1_profile_2_tool
    add(cut_extrude1_profile_2_tool.part, mode=Mode.SUBTRACT)


with BuildPart() as cut_extrude1_profile_3_tool:
    # Sketch6 → Cut-Extrude1 profile 3 (with draft: the straight prism first)
    with BuildSketch(Plane(origin=(0, 6, 0), x_dir=(1, 0, 0), z_dir=(0, 1, 0))):
        with Locations((35, 0)):
            Circle(SKETCH6_R)
    extrude(amount=-CUT_EXTRUDE1_PROFILE_3_DEPTH)
    # Cut-Extrude1 profile 3: the draft: its side faces are tilted about the plane it starts from
    cut_extrude1_profile_3_sides = [cut_extrude1_profile_3_tool.faces().sort_by_distance(p)[0] for p in [
        (33.394022569, 3.25, 0),
    ]]
    draft(cut_extrude1_profile_3_sides, Plane(origin=(0, 6, 0), x_dir=(1, 0, 0), z_dir=(0, 1, 0)), CUT_EXTRUDE1_PROFILE_3_DRAFT)


with BuildPart() as part_6:
    add(part_5.part)

    # Cut-Extrude1 profile 3: cut by cut_extrude1_profile_3_tool
    add(cut_extrude1_profile_3_tool.part, mode=Mode.SUBTRACT)

    # Sketch7 → Boss-Extrude3 (add, symmetric)
    with BuildSketch(Plane.XY):
        Polygon((51.06982026, 4), (51.03491013, 2), (51.33491013, 2), align=None)
        Polygon((-51.33491013, 2), (-51.06982026, 4), (-51.03491013, 2), align=None)
    extrude(amount=BOSS_EXTRUDE3_DEPTH, both=True)

    # Sketch8 → Boss-Extrude4 (add, symmetric)
    with BuildSketch(Plane(origin=(0, 0, 0), x_dir=(0, 0, -1), z_dir=(1, 0, 0))):
        Polygon((8.56982026, 4), (8.53491013, 2), (8.83491013, 2), align=None)
        Polygon((-8.83491013, 2), (-8.56982026, 4), (-8.53491013, 2), align=None)
    extrude(amount=BOSS_EXTRUDE4_DEPTH, both=True)


solid = part_6.part
